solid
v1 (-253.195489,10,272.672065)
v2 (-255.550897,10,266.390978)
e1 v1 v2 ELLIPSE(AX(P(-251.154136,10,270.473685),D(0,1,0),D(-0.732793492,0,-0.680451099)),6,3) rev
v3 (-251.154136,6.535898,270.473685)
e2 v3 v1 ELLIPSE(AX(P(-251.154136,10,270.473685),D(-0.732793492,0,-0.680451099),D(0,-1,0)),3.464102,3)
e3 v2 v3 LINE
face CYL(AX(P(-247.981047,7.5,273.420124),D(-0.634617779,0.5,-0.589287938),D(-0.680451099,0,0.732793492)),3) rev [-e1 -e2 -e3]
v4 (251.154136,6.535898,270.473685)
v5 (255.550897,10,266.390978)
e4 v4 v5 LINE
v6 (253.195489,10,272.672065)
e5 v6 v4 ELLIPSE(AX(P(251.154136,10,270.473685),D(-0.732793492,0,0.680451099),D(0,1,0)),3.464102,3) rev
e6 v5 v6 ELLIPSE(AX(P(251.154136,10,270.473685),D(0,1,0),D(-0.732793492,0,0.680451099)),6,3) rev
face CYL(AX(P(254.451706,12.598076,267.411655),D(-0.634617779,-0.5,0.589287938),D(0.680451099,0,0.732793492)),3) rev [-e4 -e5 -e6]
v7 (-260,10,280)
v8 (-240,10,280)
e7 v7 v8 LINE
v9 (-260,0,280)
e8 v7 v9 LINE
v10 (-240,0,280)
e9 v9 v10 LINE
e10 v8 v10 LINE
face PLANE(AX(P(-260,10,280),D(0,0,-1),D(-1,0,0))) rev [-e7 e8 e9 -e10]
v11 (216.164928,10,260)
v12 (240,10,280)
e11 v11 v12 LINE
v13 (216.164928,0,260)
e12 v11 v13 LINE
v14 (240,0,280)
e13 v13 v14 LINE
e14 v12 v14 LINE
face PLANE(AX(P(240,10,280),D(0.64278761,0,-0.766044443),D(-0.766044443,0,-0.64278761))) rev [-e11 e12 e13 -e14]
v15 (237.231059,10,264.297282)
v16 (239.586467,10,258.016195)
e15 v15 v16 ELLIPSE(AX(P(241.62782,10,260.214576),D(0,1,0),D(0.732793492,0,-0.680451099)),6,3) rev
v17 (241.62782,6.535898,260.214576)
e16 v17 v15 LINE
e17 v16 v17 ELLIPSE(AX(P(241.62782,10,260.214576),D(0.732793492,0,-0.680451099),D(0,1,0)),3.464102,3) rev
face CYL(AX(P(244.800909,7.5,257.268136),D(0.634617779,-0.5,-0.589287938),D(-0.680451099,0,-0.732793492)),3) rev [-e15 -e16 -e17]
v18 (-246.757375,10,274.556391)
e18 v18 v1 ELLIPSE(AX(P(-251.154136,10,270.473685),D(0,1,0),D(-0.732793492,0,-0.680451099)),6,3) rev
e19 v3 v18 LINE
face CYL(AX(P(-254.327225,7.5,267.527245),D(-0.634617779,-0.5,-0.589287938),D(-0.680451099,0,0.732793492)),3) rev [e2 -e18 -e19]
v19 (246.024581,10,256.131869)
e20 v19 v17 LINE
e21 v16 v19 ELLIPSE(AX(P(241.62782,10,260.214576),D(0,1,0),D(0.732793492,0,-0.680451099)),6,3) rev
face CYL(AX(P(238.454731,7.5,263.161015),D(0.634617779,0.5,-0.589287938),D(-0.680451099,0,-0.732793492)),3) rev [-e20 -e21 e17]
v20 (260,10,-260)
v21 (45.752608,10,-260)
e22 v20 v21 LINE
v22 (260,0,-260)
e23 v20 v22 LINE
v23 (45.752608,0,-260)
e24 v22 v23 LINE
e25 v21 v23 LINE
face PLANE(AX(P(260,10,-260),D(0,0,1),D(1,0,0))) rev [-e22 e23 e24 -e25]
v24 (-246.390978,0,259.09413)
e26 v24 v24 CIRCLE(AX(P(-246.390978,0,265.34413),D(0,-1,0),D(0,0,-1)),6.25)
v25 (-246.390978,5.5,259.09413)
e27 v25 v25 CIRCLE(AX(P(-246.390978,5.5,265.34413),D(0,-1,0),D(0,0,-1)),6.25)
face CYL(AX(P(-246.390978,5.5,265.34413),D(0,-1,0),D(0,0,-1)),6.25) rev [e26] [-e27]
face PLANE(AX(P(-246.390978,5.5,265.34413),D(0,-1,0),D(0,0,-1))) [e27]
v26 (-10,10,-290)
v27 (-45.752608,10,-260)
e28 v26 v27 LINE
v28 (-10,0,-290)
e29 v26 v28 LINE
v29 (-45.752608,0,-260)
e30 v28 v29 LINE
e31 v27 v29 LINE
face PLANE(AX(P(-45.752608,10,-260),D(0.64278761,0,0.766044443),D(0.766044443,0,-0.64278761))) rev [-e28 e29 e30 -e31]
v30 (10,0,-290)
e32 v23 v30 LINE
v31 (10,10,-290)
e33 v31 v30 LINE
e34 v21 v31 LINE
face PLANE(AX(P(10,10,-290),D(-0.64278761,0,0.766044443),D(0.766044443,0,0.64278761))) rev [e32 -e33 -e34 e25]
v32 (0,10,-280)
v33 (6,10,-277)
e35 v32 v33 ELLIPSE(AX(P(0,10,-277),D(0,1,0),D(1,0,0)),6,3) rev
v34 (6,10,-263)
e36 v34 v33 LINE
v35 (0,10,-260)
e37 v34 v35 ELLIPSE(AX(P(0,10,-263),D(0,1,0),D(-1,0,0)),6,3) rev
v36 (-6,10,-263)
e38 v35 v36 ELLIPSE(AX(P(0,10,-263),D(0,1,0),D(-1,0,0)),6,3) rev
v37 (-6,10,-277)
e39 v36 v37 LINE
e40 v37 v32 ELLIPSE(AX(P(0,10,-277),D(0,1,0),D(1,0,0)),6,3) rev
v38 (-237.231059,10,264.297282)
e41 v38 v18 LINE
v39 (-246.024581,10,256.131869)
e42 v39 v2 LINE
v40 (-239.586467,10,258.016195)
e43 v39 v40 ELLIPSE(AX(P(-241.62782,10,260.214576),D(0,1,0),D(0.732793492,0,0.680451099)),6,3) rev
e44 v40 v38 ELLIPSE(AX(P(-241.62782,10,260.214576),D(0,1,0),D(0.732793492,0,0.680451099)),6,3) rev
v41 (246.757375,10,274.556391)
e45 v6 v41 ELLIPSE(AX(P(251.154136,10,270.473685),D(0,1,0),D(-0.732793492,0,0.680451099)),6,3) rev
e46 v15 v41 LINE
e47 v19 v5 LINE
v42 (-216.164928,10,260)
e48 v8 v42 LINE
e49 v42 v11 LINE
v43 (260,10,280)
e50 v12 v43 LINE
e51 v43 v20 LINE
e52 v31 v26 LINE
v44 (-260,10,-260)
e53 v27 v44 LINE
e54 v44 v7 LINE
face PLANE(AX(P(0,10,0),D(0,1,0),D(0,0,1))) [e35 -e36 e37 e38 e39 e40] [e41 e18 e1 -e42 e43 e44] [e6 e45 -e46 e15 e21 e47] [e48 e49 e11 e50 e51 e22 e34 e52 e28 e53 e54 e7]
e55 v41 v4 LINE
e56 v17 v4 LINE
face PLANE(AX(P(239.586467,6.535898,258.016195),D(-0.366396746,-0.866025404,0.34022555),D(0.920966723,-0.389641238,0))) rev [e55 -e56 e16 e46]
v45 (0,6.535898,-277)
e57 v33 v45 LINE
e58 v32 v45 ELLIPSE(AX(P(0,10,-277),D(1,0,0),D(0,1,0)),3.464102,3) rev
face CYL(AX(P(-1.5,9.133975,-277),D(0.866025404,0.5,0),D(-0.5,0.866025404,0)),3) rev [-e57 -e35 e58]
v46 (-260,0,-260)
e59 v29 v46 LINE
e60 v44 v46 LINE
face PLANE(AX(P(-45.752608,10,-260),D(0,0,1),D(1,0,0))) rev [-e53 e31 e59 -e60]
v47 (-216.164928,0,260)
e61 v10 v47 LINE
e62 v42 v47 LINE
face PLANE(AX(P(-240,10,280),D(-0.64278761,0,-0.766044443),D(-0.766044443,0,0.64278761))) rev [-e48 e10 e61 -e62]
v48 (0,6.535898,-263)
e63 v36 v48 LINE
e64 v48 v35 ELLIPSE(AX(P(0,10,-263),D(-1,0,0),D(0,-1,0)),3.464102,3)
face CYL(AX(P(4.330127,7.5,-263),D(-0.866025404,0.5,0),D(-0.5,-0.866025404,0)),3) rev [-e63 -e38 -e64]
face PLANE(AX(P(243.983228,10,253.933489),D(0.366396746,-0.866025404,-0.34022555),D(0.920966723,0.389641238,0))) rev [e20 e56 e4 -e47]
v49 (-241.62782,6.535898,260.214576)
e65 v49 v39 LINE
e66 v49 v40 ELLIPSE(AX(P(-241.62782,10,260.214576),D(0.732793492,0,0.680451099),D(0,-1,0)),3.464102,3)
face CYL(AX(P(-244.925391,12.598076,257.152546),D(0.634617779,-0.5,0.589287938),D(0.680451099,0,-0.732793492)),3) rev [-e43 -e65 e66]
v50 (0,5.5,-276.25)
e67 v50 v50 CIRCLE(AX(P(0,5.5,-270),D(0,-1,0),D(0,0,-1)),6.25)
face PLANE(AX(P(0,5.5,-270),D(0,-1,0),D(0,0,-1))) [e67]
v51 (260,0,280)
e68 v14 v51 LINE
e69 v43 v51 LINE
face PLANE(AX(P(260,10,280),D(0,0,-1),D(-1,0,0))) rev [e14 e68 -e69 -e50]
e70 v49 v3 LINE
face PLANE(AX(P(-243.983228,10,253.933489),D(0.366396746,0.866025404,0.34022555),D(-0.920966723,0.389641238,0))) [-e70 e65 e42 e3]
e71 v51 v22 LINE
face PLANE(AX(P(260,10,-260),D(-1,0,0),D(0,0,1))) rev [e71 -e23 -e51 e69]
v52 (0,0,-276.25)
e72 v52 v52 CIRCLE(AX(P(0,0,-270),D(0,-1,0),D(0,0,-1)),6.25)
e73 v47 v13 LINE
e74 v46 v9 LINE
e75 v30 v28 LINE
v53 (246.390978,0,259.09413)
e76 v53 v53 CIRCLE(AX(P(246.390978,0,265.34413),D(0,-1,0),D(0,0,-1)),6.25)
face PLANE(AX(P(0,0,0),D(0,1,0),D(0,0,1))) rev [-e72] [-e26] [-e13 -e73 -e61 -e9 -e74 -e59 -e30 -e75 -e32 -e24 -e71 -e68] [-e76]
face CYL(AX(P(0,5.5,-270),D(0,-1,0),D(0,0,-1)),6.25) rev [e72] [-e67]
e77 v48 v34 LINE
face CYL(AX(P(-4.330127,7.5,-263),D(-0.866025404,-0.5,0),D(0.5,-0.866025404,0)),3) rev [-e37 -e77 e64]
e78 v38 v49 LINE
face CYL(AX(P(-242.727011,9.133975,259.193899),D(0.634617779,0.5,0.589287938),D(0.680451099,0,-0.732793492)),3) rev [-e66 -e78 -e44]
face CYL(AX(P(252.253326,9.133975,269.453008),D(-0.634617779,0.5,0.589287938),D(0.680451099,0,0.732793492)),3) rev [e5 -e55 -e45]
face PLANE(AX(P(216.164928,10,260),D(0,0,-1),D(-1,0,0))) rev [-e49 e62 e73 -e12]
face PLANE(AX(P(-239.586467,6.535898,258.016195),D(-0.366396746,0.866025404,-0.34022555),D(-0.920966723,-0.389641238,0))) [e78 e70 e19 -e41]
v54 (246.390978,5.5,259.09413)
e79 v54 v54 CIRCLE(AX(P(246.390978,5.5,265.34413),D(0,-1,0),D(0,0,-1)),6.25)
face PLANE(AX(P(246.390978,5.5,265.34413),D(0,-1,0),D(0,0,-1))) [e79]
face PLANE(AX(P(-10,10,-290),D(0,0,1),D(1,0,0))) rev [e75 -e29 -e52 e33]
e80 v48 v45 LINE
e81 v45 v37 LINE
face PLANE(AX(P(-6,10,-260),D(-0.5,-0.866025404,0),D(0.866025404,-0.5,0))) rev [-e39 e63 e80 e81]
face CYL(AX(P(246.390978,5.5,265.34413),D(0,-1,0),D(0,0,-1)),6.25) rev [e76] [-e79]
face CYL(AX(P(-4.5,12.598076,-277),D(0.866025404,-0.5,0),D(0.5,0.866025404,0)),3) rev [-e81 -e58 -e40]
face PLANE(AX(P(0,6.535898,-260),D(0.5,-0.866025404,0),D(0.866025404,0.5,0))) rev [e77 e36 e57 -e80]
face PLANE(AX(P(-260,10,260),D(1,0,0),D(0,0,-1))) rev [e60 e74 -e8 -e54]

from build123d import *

# Parameters (mm, degrees)
BOSS_EXTRUDE1_DEPTH  = 10
CUT_EXTRUDE1_DEPTH   = 20
FILLET1_R            = 3
FILLET1_OF_MIRROR1_R = 3
CUT_EXTRUDE2_DEPTH   = 20
FILLET2_R            = 3
SKETCH7_R            = 6.25
CUT_EXTRUDE3_DEPTH   = 5.5


with BuildPart() as part:
    # Sketch1 → Boss-Extrude1 (new body)
    with BuildSketch(Plane(origin=(0, 0, 0), x_dir=(1, 0, 0), z_dir=(0, 1, 0))):
        Polygon((-260, -260), (-260, -280), (-240, -280), (-216.164928148, -260), (216.164928148, -260), (240, -280), (260, -280), (260, -260), (260, 260), (45.752607778, 260), (10, 290), (-10, 290), (-45.752607778, 260), (-260, 260), align=None)
    extrude(amount=BOSS_EXTRUDE1_DEPTH)

    # Sketch5 → Cut-Extrude1 (cut)
    with BuildSketch(Plane(origin=(-253.195489006, 0, 272.672065084), x_dir=(0, -1, 0), z_dir=(0.6804510993672804, 0, -0.7327934916262968))):
        Polygon((-10, 6), (-10, -6), (-6.535898385, 0), align=None)
    cut_extrude1 = extrude(amount=CUT_EXTRUDE1_DEPTH, mode=Mode.SUBTRACT)

    # Fillet1
    fillet1_edges = [part.edges().sort_by_distance(p)[0] for p in [
        (-241.784847494, 8.267949192, 255.974841953),
        (-237.388086544, 8.267949192, 260.057548549),
        (-250.997108531, 8.267949192, 274.713418382),
        (-255.393869481, 8.267949192, 270.630711786),
    ]]
    fillet(fillet1_edges, radius=FILLET1_R - 0.0001)  # a hair under: the kernel refuses the full size

    # Mirror1: Cut-Extrude1 across plane
    add(cut_extrude1.mirror(Plane(origin=(0, 0, 0), x_dir=(0, 0, 1), z_dir=(1, 0, 0))), mode=Mode.SUBTRACT)

    # Fillet1 of Mirror1
    fillet1_of_mirror1_edges = [part.edges().sort_by_distance(p)[0] for p in [
        (241.784847494, 8.267949192, 255.974841953),
        (237.388086544, 8.267949192, 260.057548549),
        (250.997108531, 8.267949192, 274.713418382),
        (255.393869481, 8.267949192, 270.630711786),
    ]]
    fillet(fillet1_of_mirror1_edges, radius=FILLET1_OF_MIRROR1_R - 0.0001)  # a hair under: the kernel refuses the full size

    # Sketch6 → Cut-Extrude2 (cut)
    with BuildSketch(Plane(origin=(0, 0, -280), x_dir=(-1, 0, 0), z_dir=(0, 0, -1))):
        Polygon((-6, 10), (6, 10), (0, 6.535898385), align=None)
    extrude(amount=-CUT_EXTRUDE2_DEPTH, mode=Mode.SUBTRACT)

    # Fillet2
    fillet2_edges = [part.edges().sort_by_distance(p)[0] for p in [
        (3, 8.267949192, -260),
        (-3, 8.267949192, -260),
        (3, 8.267949192, -280),
        (-3, 8.267949192, -280),
    ]]
    fillet(fillet2_edges, radius=FILLET2_R - 0.0001)  # a hair under: the kernel refuses the full size

    # Sketch7 → Cut-Extrude3 (cut)
    with BuildSketch(Plane.XZ):
        with Locations(Location((-246.390978013, 265.344130167, 0), (0, 0, 270))):
            Circle(SKETCH7_R)
        with Locations(Location((246.390978013, 265.344130167, 0), (0, 0, 270))):
            Circle(SKETCH7_R)
        with Locations(Location((0, -270, 0), (0, 0, 270))):
            Circle(SKETCH7_R)
    extrude(amount=-CUT_EXTRUDE3_DEPTH, mode=Mode.SUBTRACT)


solid = part.part
